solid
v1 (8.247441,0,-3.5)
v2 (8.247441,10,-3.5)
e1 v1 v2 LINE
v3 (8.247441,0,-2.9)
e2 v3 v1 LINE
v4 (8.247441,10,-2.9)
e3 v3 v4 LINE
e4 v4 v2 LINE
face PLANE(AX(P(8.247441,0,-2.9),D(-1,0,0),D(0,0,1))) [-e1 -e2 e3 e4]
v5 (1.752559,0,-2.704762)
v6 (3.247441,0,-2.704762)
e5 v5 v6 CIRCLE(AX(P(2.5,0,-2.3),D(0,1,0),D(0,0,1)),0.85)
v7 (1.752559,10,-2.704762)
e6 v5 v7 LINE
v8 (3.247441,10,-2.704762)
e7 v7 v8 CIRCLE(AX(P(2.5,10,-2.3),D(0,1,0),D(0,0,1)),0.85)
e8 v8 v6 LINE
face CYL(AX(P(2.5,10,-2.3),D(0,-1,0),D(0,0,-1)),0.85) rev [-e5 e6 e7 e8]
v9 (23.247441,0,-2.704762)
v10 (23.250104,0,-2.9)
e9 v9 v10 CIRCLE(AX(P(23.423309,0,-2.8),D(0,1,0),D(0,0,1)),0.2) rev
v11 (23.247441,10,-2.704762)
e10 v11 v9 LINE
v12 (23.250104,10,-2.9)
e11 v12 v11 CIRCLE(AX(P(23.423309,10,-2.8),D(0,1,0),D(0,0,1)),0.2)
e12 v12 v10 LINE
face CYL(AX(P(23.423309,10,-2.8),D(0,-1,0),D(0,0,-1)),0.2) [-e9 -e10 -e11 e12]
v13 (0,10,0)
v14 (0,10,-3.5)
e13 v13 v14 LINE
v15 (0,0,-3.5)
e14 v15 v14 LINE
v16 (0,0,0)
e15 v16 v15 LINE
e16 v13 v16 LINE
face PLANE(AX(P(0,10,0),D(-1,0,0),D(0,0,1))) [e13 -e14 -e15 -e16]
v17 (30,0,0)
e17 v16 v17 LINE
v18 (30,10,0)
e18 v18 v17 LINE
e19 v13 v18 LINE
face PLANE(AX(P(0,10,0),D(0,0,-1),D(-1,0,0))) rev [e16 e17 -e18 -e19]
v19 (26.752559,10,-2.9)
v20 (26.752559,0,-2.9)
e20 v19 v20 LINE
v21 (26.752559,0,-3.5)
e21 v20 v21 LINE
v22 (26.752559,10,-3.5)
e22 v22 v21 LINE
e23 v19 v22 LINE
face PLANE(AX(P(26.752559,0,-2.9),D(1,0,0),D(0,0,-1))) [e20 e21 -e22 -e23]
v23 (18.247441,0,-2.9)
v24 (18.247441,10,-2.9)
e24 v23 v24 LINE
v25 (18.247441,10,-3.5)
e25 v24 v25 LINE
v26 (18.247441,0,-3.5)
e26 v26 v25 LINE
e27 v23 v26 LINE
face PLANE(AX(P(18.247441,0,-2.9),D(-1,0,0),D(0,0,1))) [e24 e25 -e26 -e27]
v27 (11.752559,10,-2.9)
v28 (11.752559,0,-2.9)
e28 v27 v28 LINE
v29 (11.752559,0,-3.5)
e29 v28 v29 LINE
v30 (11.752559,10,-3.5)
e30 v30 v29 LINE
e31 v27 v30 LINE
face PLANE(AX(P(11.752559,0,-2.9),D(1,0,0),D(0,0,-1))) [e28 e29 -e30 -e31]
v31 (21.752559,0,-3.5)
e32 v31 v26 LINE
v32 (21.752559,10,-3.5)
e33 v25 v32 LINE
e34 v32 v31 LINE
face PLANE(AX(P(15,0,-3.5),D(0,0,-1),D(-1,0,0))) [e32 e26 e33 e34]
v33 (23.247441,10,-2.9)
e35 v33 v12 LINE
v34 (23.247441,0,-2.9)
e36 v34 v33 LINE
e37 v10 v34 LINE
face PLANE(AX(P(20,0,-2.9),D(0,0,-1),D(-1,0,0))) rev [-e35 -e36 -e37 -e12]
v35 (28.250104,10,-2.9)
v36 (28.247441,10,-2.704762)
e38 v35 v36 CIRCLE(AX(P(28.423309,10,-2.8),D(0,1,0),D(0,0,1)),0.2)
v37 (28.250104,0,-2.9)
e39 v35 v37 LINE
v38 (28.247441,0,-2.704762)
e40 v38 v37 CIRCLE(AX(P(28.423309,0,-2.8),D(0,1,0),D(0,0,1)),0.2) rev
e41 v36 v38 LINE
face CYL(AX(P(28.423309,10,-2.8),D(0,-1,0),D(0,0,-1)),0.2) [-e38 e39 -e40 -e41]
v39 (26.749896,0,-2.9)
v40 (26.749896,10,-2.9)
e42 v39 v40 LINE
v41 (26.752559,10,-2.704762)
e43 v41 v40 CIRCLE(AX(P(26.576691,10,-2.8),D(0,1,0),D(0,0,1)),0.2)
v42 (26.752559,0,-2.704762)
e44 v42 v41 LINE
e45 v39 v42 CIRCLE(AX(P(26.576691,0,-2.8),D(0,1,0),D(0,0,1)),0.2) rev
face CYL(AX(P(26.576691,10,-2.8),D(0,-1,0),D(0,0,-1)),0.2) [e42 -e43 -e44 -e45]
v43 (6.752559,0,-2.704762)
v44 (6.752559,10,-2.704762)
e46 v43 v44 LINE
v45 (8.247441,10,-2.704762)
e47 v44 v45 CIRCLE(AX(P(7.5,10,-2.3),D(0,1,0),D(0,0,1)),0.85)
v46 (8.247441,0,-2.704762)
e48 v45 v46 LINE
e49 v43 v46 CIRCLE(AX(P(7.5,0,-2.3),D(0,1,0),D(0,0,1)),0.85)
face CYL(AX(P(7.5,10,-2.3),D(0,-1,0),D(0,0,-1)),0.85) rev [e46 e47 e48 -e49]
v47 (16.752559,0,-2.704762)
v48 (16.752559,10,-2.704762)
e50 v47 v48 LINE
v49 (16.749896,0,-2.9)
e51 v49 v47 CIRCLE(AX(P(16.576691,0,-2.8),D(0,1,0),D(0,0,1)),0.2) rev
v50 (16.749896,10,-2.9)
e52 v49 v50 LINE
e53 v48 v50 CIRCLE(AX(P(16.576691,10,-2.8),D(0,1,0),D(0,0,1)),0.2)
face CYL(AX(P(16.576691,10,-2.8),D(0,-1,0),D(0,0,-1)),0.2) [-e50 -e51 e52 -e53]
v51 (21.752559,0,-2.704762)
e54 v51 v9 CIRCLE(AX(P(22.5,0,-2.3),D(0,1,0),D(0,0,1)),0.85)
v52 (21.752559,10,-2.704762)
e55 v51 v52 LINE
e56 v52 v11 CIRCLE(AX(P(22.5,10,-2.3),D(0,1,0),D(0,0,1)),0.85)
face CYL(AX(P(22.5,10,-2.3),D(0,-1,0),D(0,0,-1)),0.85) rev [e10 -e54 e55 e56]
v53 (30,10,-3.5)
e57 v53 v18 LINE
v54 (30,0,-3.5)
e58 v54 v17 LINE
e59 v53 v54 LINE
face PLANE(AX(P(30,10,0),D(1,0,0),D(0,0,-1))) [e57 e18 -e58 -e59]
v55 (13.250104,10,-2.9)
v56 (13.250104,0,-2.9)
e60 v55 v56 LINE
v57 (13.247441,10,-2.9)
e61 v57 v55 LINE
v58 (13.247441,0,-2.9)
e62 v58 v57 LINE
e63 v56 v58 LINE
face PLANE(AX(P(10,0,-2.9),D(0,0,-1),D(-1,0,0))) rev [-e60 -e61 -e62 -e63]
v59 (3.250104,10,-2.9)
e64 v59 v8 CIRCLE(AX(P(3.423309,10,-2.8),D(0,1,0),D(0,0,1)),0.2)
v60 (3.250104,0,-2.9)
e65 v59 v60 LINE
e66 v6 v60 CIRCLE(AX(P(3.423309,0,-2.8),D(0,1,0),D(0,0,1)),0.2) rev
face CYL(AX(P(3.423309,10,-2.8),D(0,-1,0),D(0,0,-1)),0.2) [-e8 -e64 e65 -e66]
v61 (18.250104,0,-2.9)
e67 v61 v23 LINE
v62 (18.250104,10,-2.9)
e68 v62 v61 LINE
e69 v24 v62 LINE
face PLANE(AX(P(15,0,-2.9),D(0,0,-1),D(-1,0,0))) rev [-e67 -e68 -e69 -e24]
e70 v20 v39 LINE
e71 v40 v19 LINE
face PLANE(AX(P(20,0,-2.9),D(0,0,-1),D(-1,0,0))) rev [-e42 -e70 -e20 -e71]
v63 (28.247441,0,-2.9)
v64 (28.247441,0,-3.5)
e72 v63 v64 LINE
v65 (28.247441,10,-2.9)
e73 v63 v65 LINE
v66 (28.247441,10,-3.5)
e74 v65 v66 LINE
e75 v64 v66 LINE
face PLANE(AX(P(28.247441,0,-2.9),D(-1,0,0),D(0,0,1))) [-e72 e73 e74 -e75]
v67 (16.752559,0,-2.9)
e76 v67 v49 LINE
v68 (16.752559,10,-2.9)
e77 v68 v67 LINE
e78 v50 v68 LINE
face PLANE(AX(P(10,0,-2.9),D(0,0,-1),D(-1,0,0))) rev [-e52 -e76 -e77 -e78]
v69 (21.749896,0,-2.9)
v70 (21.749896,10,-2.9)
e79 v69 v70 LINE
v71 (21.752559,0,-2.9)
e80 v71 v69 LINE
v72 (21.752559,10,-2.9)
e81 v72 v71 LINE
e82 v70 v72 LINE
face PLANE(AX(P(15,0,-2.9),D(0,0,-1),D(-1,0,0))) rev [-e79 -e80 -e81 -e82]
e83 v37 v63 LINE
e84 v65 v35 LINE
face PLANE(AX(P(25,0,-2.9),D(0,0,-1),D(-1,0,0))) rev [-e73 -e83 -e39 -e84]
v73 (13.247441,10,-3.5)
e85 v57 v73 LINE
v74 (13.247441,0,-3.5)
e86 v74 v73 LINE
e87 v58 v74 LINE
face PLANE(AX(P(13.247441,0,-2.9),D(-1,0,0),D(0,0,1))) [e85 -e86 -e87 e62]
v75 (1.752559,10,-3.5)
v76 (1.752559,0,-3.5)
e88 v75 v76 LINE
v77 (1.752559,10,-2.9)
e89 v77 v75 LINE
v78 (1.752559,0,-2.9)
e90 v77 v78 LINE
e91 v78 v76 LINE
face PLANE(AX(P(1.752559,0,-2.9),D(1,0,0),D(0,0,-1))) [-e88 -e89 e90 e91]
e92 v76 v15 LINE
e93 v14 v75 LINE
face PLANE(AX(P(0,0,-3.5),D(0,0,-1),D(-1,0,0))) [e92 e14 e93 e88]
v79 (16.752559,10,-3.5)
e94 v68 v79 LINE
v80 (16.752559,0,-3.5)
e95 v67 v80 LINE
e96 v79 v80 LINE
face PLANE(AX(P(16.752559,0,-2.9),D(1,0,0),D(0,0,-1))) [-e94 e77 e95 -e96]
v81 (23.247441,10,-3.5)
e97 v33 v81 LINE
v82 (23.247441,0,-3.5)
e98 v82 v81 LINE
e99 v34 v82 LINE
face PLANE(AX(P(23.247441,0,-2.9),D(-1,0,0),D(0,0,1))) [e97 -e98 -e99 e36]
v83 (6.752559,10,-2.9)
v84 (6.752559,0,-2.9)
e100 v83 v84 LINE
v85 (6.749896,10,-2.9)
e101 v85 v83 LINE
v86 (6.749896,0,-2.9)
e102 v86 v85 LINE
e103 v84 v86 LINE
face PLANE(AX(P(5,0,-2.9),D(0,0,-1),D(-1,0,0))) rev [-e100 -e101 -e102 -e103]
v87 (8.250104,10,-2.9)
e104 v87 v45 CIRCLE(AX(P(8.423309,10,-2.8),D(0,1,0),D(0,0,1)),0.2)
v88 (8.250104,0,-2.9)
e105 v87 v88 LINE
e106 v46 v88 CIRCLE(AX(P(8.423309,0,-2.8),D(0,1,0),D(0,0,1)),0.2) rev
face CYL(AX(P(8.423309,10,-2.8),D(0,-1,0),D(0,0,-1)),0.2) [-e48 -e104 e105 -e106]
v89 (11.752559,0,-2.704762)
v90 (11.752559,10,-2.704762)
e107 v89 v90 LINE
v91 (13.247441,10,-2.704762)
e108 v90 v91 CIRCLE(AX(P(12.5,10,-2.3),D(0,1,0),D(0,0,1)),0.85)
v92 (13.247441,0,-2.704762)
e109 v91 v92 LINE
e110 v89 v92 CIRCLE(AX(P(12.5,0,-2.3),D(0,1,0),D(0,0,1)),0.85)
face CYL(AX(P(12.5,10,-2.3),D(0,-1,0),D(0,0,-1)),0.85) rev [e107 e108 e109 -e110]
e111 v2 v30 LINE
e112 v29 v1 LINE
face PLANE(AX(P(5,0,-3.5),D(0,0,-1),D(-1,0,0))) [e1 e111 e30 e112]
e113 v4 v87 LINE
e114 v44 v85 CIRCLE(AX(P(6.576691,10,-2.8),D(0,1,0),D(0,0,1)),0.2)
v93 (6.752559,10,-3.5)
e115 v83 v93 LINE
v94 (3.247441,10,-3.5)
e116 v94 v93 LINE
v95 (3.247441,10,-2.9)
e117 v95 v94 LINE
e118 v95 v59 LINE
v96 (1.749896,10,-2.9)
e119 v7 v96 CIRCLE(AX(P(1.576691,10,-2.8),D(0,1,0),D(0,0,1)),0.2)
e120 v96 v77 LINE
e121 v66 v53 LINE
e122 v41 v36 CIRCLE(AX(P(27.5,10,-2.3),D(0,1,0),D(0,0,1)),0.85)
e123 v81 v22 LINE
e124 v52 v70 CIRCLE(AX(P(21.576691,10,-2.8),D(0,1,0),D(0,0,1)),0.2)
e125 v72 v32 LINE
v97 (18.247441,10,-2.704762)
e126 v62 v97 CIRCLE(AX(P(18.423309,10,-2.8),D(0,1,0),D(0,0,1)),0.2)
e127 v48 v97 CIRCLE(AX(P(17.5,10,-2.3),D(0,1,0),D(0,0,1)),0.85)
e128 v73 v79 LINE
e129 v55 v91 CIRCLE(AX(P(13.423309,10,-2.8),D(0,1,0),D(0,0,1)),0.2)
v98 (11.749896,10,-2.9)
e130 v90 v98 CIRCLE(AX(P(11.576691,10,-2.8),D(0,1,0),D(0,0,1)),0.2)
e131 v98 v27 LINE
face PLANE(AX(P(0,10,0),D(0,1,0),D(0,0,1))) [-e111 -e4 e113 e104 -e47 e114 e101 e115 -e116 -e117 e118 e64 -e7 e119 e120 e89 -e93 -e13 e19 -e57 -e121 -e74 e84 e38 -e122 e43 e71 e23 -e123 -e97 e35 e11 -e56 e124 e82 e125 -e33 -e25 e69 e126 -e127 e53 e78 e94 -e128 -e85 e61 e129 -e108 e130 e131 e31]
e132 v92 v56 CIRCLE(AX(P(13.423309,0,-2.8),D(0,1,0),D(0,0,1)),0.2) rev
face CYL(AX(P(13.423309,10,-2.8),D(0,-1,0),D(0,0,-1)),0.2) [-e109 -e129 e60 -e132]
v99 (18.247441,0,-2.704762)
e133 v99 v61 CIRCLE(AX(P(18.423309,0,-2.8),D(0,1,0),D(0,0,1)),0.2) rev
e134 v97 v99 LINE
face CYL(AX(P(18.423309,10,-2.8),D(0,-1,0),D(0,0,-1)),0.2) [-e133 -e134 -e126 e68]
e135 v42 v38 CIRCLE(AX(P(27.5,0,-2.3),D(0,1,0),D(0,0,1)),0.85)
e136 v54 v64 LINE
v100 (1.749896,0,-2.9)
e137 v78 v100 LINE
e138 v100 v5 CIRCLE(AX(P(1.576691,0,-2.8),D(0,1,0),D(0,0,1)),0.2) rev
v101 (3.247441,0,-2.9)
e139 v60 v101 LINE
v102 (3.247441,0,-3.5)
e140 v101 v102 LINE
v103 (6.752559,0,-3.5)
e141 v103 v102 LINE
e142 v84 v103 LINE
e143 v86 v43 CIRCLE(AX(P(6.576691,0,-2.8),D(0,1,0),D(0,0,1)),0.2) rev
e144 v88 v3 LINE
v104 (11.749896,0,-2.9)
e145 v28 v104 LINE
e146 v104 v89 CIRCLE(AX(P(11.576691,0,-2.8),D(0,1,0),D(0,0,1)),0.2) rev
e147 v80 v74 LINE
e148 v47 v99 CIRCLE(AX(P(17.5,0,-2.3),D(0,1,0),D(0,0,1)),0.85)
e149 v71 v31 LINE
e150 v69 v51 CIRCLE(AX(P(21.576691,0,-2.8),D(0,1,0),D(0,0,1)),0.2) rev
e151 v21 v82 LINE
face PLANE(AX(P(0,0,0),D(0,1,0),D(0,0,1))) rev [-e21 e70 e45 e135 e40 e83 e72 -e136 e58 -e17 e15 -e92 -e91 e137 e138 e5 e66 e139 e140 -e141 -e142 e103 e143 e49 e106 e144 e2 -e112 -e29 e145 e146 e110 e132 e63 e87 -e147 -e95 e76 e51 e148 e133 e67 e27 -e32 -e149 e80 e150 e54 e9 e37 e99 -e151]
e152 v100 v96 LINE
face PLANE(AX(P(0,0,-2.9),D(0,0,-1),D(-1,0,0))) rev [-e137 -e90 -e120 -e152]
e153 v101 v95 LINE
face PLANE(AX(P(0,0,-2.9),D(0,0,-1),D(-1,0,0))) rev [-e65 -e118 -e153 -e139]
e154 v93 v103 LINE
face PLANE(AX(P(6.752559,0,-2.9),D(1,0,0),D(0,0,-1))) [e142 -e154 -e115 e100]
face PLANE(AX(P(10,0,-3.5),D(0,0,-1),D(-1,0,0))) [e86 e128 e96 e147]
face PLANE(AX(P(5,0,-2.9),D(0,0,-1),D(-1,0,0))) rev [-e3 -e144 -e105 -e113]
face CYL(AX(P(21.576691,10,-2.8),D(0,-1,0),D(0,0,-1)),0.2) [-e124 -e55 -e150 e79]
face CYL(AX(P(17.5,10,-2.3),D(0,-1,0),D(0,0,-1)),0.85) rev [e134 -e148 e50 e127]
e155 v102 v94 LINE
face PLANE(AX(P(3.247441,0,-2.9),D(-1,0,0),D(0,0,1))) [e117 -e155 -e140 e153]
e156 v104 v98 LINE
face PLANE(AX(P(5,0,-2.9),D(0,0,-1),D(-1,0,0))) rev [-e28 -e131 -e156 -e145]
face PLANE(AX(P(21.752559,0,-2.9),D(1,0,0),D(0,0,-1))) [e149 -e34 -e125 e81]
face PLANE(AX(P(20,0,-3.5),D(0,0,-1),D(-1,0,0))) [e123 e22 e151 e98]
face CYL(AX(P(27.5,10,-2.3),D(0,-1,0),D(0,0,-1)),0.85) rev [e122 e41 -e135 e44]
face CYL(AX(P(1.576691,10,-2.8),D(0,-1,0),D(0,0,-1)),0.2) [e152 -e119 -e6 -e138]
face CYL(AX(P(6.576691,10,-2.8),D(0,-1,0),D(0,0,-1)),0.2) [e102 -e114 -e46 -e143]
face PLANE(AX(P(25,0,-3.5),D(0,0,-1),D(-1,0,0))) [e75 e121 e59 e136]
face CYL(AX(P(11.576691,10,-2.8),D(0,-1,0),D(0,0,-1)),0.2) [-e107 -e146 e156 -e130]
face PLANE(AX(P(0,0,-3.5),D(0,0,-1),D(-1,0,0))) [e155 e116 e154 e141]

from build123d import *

# Parameters (mm, degrees)
BOSS_EXTRUDE1_DEPTH = 10
FILLET1_R           = 0.2
BOSS_EXTRUDE2_START = -0.1
SKETCH2_W           = 1.752559166
SKETCH2_H           = 10
BOSS_EXTRUDE2_DEPTH = 0.6
LPATTERN1_DEPTH     = 10


# Read off the part's stored shape, not the designer's step: LPattern1
with BuildPart() as part:
    # Sketch1 → Boss-Extrude1 (new body)
    with BuildSketch(Plane(origin=(0, 0, 0), x_dir=(1, 0, 0), z_dir=(0, 1, 0))):
        with BuildLine():
            Line((0, 3), (0, 0))
            Line((0, 0), (5, 0))
            Line((5, 0), (5, 3))
            Line((5, 3), (2.982182538, 3))
            ThreePointArc((2.982182538, 3), (3.252447725, 2.695376303), (3.35, 2.3))
            ThreePointArc((3.35, 2.3), (2.104623697, 1.547552275), (2.017817462, 3))
            Line((2.017817462, 3), (0, 3))
        make_face()
    extrude(amount=BOSS_EXTRUDE1_DEPTH)

    # Fillet1
    fillet1_edges = [part.edges().sort_by_distance(p)[0] for p in [
        (2.982182538, 5, -3),
        (2.017817462, 5, -3),
    ]]
    fillet(fillet1_edges, radius=FILLET1_R)

    # Sketch2 → Boss-Extrude2 (add)
    with BuildSketch(Plane(origin=(0, 0, -3), x_dir=(-1, 0, 0), z_dir=(0, 0, -1)).offset(BOSS_EXTRUDE2_START)):
        with Locations((-0.876279583, 5)):
            Rectangle(SKETCH2_W, SKETCH2_H)
        with Locations((-4.123720417, 5)):
            Rectangle(SKETCH2_W, SKETCH2_H)
    extrude(amount=BOSS_EXTRUDE2_DEPTH)

    # LPattern1 outline → LPattern1 (add)
    with BuildSketch(Plane(origin=(0, 0, 0), x_dir=(1, 0, 0), z_dir=(0, 1, 0))):
        with BuildLine():
            ThreePointArc((28.250104185, 2.9), (28.223327872, 2.802728057), (28.247440834, 2.704761905))
            ThreePointArc((28.247440834, 2.704761905), (27.5, 1.45), (26.752559166, 2.704761905))
            ThreePointArc((26.752559166, 2.704761905), (26.776672128, 2.802728057), (26.749895815, 2.9))
            Line((26.749895815, 2.9), (26.752559166, 2.9))
            Line((26.752559166, 2.9), (26.752559166, 3.5))
            Line((26.752559166, 3.5), (23.247440834, 3.5))
            Line((23.247440834, 3.5), (23.247440834, 2.9))
            Line((23.247440834, 2.9), (23.250104185, 2.9))
            ThreePointArc((23.250104185, 2.9), (23.223327872, 2.802728057), (23.247440834, 2.704761905))
            ThreePointArc((23.247440834, 2.704761905), (22.5, 1.45), (21.752559166, 2.704761905))
            ThreePointArc((21.752559166, 2.704761905), (21.776672128, 2.802728057), (21.749895815, 2.9))
            Line((21.749895815, 2.9), (21.752559166, 2.9))
            Line((21.752559166, 2.9), (21.752559166, 3.5))
            Line((21.752559166, 3.5), (18.247440834, 3.5))
            Line((18.247440834, 3.5), (18.247440834, 2.9))
            Line((18.247440834, 2.9), (18.250104185, 2.9))
            ThreePointArc((18.250104185, 2.9), (18.223327872, 2.802728057), (18.247440834, 2.704761905))
            ThreePointArc((18.247440834, 2.704761905), (17.5, 1.45), (16.752559166, 2.704761905))
            ThreePointArc((16.752559166, 2.704761905), (16.776672128, 2.802728057), (16.749895815, 2.9))
            Line((16.749895815, 2.9), (16.752559166, 2.9))
            Line((16.752559166, 2.9), (16.752559166, 3.5))
            Line((16.752559166, 3.5), (13.247440834, 3.5))
            Line((13.247440834, 3.5), (13.247440834, 2.9))
            Line((13.247440834, 2.9), (13.250104185, 2.9))
            ThreePointArc((13.250104185, 2.9), (13.223327872, 2.802728057), (13.247440834, 2.704761905))
            ThreePointArc((13.247440834, 2.704761905), (12.5, 1.45), (11.752559166, 2.704761905))
            ThreePointArc((11.752559166, 2.704761905), (11.776672128, 2.802728057), (11.749895815, 2.9))
            Line((11.749895815, 2.9), (11.752559166, 2.9))
            Line((11.752559166, 2.9), (11.752559166, 3.5))
            Line((11.752559166, 3.5), (8.247440834, 3.5))
            Line((8.247440834, 3.5), (8.247440834, 2.9))
            Line((8.247440834, 2.9), (8.250104185, 2.9))
            ThreePointArc((8.250104185, 2.9), (8.223327872, 2.802728057), (8.247440834, 2.704761905))
            ThreePointArc((8.247440834, 2.704761905), (7.5, 1.45), (6.752559166, 2.704761905))
            ThreePointArc((6.752559166, 2.704761905), (6.776672128, 2.802728057), (6.749895815, 2.9))
            Line((6.749895815, 2.9), (6.752559166, 2.9))
            Line((6.752559166, 2.9), (6.752559166, 3.5))
            Line((6.752559166, 3.5), (5, 3.5))
            Line((5, 3.5), (5, 0))
            Line((5, 0), (30, 0))
            Line((30, 0), (30, 3.5))
            Line((30, 3.5), (28.247440834, 3.5))
            Line((28.247440834, 3.5), (28.247440834, 2.9))
            Line((28.247440834, 2.9), (28.250104185, 2.9))
        make_face()
    extrude(amount=LPATTERN1_DEPTH)


solid = part.part
